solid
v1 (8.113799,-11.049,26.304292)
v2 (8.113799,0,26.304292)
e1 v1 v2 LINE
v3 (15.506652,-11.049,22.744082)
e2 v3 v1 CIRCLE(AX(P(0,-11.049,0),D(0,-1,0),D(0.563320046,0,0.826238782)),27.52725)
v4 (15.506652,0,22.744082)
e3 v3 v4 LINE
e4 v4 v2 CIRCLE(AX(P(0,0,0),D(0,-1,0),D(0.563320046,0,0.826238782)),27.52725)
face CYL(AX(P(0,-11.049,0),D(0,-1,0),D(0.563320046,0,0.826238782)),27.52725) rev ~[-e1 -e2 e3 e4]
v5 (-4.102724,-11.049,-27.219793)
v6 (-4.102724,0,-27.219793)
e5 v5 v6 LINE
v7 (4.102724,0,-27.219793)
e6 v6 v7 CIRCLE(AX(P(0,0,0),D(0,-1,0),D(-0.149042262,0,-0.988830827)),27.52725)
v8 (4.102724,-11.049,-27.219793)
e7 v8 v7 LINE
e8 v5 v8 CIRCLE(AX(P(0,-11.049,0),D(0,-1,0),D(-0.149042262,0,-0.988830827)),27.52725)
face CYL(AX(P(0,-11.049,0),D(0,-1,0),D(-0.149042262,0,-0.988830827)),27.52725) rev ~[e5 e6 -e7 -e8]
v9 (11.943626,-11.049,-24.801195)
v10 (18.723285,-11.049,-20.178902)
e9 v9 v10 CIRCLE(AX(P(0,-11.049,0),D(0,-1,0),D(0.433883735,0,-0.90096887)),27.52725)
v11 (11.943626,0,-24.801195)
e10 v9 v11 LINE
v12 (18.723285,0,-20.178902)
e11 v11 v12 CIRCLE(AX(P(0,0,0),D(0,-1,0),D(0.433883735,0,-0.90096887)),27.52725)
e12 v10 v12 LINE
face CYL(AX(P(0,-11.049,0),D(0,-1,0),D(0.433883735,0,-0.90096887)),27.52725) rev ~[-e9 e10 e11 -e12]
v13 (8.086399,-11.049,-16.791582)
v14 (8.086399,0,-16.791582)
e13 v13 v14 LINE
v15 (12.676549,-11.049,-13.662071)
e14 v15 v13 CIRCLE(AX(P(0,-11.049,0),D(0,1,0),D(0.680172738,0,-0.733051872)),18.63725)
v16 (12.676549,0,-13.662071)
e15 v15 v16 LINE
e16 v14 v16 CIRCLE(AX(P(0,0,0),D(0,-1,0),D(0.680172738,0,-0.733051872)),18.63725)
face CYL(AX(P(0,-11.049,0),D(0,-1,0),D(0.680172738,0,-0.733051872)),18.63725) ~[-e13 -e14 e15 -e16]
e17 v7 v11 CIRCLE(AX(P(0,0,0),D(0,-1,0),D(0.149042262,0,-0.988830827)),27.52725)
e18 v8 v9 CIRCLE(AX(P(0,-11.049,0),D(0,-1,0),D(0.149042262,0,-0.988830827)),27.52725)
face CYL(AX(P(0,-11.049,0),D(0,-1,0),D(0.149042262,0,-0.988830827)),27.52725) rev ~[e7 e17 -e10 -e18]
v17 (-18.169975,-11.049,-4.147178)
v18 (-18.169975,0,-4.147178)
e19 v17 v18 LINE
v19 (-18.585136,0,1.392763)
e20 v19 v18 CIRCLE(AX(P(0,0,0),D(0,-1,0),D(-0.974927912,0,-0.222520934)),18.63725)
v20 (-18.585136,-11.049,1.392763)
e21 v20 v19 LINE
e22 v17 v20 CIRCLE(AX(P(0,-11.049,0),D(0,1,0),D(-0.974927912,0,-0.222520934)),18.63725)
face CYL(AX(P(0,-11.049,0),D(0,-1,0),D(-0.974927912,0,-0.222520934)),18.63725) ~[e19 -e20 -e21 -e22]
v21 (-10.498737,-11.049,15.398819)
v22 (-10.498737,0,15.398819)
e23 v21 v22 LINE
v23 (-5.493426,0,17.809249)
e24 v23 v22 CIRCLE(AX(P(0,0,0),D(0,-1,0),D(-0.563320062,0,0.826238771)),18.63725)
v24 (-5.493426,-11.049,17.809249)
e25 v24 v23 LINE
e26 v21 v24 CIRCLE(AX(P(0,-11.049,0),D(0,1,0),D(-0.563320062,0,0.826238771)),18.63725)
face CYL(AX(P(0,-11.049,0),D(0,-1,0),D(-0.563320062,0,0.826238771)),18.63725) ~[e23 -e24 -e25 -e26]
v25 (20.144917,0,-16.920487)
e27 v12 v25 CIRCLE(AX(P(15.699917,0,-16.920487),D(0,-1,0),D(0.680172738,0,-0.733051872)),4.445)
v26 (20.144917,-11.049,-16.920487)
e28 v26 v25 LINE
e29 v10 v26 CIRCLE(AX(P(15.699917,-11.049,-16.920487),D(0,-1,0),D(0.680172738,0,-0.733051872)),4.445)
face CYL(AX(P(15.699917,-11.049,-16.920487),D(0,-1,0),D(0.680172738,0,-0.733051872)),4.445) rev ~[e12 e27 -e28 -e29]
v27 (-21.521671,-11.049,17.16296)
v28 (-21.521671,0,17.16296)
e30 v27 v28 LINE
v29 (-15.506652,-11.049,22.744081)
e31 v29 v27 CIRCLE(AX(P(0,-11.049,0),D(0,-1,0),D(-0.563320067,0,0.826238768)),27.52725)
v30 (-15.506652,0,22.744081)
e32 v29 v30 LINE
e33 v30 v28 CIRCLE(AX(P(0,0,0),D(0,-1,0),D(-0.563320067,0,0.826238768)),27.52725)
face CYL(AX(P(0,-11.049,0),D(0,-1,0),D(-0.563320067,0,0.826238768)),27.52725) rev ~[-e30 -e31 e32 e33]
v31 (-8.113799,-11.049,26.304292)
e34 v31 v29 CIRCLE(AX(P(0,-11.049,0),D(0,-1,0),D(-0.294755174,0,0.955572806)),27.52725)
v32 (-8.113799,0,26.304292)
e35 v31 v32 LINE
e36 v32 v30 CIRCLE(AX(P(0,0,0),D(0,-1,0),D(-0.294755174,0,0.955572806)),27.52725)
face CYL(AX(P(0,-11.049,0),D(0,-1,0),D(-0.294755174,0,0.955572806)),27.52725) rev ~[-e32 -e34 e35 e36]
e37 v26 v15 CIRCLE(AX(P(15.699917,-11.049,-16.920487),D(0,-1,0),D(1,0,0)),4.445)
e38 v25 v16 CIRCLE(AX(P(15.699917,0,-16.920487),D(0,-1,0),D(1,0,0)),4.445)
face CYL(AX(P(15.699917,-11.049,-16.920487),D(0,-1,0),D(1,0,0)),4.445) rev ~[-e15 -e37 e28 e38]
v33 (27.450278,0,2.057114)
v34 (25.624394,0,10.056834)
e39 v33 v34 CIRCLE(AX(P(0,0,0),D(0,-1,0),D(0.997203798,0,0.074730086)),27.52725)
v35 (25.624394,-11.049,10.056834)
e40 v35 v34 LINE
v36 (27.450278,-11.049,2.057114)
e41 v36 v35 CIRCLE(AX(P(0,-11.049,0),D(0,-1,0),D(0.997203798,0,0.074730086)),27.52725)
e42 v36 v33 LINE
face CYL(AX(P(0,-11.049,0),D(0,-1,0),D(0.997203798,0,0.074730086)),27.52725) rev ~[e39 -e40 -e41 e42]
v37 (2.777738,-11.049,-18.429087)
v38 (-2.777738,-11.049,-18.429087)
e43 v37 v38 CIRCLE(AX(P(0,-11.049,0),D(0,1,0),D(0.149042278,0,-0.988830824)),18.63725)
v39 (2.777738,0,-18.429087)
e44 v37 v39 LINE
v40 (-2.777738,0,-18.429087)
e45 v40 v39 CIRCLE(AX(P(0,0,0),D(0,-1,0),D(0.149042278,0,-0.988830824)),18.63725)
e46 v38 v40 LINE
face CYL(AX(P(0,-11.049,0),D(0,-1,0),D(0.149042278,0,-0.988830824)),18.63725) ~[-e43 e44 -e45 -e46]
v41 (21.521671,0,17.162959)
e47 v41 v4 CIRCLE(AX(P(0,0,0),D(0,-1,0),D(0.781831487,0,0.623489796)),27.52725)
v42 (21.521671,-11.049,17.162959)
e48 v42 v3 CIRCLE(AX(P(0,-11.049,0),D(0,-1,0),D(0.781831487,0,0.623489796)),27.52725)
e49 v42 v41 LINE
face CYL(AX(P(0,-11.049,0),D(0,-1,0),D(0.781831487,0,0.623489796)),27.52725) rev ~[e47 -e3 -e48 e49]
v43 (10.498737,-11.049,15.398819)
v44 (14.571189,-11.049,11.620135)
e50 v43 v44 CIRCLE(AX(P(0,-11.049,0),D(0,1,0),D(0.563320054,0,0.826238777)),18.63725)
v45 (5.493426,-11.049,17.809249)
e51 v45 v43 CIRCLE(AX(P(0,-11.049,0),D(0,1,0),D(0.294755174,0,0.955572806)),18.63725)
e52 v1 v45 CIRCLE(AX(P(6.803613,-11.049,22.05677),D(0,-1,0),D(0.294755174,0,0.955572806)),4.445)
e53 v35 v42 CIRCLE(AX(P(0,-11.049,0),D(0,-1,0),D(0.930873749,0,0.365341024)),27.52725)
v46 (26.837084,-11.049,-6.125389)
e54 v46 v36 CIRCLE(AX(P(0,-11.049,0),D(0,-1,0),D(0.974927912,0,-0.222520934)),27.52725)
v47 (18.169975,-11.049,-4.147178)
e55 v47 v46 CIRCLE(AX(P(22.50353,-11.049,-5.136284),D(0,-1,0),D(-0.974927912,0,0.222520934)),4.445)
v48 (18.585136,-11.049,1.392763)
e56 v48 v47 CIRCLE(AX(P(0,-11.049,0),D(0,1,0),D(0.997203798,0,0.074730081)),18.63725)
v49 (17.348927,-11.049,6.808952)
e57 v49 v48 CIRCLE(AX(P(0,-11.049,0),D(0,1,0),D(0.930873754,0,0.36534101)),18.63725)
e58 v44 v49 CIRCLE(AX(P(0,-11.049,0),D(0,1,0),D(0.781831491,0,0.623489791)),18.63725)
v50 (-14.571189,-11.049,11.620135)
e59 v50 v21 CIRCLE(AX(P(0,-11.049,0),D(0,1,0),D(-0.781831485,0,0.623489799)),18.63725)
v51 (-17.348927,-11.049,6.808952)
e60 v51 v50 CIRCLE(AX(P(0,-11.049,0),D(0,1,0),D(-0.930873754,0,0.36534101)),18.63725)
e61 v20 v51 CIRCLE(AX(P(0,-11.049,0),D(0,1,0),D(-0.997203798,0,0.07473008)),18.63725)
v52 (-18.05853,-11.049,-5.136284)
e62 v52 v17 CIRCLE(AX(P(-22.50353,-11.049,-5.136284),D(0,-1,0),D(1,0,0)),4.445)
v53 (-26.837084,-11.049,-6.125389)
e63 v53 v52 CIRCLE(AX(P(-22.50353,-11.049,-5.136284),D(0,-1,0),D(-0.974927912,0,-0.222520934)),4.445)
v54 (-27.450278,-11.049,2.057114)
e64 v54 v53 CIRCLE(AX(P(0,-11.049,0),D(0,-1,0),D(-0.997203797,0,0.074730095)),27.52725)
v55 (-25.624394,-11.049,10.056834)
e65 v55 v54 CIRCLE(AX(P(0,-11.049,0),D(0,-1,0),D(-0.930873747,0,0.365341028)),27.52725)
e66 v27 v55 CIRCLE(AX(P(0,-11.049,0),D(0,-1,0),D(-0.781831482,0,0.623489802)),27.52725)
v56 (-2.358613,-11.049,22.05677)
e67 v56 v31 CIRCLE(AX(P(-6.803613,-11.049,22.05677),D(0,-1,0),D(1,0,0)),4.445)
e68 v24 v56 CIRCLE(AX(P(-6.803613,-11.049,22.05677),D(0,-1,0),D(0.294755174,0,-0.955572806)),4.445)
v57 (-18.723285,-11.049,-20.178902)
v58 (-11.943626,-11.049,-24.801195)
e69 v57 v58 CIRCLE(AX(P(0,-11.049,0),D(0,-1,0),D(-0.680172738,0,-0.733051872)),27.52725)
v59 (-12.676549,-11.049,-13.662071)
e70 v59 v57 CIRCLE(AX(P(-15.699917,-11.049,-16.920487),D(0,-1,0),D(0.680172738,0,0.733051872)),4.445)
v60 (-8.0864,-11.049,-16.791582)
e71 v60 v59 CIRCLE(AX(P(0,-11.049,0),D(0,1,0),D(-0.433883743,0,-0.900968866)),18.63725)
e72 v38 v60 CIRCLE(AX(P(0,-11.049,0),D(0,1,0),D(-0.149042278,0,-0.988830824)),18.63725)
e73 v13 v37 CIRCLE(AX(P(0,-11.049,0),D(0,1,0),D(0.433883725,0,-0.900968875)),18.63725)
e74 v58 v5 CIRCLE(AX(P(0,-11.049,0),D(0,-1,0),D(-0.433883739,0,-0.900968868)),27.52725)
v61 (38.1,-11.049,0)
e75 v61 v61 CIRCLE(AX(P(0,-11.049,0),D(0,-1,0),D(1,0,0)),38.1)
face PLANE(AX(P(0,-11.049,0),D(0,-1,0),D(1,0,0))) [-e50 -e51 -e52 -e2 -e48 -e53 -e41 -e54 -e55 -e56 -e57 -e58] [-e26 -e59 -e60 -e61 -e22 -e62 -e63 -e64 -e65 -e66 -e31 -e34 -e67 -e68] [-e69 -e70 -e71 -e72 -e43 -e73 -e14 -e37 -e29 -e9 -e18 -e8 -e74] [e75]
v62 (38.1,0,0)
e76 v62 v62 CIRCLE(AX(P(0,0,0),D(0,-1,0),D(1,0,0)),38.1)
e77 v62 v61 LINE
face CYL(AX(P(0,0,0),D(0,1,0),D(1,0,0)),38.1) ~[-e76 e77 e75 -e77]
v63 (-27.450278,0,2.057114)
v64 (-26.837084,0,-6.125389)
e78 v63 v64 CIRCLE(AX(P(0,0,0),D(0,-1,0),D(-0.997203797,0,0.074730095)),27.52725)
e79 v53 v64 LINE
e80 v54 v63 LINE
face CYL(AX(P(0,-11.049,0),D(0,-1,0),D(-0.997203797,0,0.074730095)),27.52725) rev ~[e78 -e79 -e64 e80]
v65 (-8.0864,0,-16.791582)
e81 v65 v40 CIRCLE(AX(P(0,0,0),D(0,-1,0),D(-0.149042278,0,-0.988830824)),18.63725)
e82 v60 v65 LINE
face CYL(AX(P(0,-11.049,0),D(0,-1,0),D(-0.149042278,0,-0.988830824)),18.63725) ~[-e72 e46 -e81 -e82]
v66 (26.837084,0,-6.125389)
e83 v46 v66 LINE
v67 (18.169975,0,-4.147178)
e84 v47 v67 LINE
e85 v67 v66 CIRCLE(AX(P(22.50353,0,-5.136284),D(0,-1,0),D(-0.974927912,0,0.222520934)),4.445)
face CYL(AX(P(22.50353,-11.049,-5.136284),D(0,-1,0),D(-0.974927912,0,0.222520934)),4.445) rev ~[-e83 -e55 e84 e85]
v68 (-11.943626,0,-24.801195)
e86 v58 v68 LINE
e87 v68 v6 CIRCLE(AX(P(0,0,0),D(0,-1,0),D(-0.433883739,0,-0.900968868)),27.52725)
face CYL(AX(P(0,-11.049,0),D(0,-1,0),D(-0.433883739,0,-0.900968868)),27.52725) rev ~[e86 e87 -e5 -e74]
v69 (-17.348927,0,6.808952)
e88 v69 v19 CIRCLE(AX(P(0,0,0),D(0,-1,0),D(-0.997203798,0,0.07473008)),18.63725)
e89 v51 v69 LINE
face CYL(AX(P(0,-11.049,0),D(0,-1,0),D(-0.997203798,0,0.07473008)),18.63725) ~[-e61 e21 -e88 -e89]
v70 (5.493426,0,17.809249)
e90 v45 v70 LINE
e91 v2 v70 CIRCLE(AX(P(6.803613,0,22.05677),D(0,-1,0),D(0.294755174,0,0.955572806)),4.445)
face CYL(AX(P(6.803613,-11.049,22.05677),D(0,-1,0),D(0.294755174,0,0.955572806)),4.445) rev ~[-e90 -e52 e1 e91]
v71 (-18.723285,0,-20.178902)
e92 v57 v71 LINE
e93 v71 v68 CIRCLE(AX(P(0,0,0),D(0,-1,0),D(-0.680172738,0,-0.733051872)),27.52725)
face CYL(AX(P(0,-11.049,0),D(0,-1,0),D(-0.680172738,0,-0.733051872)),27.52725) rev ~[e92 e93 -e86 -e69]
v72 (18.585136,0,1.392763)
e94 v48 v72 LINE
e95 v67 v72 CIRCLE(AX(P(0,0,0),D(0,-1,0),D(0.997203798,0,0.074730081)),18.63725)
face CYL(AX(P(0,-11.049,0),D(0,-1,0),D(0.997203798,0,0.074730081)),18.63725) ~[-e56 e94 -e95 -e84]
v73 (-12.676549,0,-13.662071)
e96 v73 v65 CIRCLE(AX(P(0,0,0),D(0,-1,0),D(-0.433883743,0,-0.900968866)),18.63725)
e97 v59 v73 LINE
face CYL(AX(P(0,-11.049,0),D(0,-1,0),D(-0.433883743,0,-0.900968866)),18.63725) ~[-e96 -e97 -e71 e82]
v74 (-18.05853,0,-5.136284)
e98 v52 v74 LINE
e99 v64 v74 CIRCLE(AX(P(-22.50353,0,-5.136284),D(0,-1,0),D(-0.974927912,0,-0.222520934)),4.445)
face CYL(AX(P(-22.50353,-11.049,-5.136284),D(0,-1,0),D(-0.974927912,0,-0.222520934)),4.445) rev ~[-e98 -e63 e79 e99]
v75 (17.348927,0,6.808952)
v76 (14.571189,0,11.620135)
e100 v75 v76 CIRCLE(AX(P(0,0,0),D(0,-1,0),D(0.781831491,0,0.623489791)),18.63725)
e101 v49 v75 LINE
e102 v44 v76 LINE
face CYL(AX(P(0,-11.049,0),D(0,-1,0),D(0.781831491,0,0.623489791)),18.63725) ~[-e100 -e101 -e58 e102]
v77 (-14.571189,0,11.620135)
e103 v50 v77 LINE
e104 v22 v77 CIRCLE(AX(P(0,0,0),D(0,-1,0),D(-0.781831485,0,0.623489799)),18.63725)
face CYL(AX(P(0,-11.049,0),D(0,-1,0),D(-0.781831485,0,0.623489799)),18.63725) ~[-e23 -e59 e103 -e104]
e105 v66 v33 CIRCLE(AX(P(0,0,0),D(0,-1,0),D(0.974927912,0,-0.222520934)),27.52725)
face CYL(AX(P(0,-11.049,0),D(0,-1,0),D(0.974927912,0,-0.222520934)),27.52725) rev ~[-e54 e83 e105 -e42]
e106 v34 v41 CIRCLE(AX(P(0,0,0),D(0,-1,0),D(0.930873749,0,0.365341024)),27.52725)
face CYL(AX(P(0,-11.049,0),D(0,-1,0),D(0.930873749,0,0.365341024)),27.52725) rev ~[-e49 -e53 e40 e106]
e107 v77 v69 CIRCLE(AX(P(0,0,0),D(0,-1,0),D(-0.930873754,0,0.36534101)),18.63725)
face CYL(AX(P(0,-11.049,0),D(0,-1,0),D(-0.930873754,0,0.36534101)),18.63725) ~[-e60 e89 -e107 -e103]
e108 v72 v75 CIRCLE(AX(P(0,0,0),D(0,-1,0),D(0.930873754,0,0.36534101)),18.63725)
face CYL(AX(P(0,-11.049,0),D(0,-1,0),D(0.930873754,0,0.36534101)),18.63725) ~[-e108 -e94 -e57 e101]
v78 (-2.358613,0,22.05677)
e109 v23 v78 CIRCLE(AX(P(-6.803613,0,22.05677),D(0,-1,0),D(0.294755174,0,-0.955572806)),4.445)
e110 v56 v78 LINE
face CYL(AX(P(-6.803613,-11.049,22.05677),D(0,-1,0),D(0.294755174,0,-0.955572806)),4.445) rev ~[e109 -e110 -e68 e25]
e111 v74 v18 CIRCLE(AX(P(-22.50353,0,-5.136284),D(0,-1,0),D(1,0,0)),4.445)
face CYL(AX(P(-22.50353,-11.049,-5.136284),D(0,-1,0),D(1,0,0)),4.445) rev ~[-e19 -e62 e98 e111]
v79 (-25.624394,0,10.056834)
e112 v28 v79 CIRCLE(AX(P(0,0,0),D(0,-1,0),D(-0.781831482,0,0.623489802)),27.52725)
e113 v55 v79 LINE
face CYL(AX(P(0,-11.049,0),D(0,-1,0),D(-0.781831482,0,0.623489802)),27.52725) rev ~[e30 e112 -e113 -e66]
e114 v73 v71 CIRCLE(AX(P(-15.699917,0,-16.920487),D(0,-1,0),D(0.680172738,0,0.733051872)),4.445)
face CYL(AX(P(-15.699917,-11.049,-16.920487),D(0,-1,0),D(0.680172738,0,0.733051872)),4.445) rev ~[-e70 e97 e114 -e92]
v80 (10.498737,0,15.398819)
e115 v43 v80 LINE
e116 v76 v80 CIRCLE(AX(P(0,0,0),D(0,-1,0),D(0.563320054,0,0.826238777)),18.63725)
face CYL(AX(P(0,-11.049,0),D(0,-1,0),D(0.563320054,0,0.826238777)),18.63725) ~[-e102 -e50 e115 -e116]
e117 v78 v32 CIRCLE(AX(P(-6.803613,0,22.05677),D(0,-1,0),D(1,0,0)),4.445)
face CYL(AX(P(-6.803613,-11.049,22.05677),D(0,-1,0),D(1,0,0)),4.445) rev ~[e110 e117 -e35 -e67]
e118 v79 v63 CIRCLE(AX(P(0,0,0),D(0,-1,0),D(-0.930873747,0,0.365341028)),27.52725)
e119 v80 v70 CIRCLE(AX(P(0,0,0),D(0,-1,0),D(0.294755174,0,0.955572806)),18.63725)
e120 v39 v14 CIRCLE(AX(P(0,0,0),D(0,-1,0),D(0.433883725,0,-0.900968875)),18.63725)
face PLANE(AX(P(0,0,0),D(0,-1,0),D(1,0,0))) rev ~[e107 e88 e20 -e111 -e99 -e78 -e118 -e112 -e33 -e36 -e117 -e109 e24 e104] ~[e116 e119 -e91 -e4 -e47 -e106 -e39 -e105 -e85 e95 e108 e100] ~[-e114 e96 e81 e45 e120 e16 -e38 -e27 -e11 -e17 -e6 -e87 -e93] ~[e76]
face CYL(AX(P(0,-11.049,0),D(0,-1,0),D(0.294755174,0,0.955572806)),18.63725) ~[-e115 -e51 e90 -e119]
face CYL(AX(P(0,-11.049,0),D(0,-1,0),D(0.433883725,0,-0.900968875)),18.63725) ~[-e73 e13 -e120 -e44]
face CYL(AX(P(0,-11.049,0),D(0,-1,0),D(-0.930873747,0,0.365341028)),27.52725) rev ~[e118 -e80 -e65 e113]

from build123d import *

# Parameters (mm, degrees)
F0_R     = 38.1
F1_DEPTH = 11.049
F3_DEPTH = 11.05


with BuildPart() as f1:
    # F0 (on Front) → F1 (new body)
    with BuildSketch(Plane.XZ):
        Circle(F0_R)
    extrude(amount=F1_DEPTH)

    # F2 (on face) → F3 (cut, through all)
    with BuildSketch(Plane.XZ.offset(11.049)):
        with BuildLine():
            ThreePointArc((-5.4934258743, 17.8092492746), (-3.2271754935, 19.4172396715), (-2.3586126245, 22.0567703964))
            ThreePointArc((-2.3586126245, 22.0567703964), (-4.1640818997, 25.6332075274), (-8.1137993748, 26.3042915181))
            ThreePointArc((-8.1137993748, 26.3042915181), (-10.0430162679, 25.1004998579), (-11.1244292478, 23.1001153577))
            ThreePointArc((-11.1244292478, 23.1001153577), (-9.253900361, 21.4598737334), (-8.5576944102, 19.0714499485))
            ThreePointArc((-8.5576944102, 19.0714499485), (-8.5888494373, 18.5460952541), (-8.681877787, 18.0281049871))
            ThreePointArc((-8.681877787, 18.0281049871), (-7.108001728, 17.6222047723), (-5.4934258743, 17.8092492746))
        make_face()
        with BuildLine():
            ThreePointArc((-11.1244292478, 23.1001153577), (-10.0430162679, 25.1004998579), (-8.1137993748, 26.3042915181))
            ThreePointArc((-8.1137993748, 26.3042915181), (-11.9436262917, 24.8011952044), (-15.5066523142, 22.7440811326))
            ThreePointArc((-15.5066523142, 22.7440811326), (-13.36264294, 23.5018519681), (-11.1244292478, 23.1001153577))
        make_face()
        with BuildLine():
            ThreePointArc((-10.498736832, 15.3988185422), (-8.0863997604, 16.7915820124), (-5.4934258743, 17.8092492746))
            ThreePointArc((-5.4934258743, 17.8092492746), (-7.108001728, 17.6222047723), (-8.681877787, 18.0281049871))
            ThreePointArc((-8.681877787, 18.0281049871), (-9.34582792, 16.5445244505), (-10.498736832, 15.3988185422))
        make_face()
        with BuildLine():
            ThreePointArc((-8.5576944102, 19.0714499485), (-9.253900361, 21.4598737334), (-11.1244292478, 23.1001153577))
            ThreePointArc((-11.1244292478, 23.1001153577), (-10.8084192424, 20.128157176), (-8.681877787, 18.0281049871))
            ThreePointArc((-8.681877787, 18.0281049871), (-8.5888494373, 18.5460952541), (-8.5576944102, 19.0714499485))
        make_face()
        with BuildLine():
            ThreePointArc((-8.681877787, 18.0281049871), (-10.8084192424, 20.128157176), (-11.1244292478, 23.1001153577))
            ThreePointArc((-11.1244292478, 23.1001153577), (-13.36264294, 23.5018519681), (-15.5066523142, 22.7440811326))
            ThreePointArc((-15.5066523142, 22.7440811326), (-16.9953355125, 21.0251239305), (-17.4390806002, 18.7948589632))
            ThreePointArc((-17.4390806002, 18.7948589632), (-14.7880141659, 17.4149152983), (-13.6100435462, 14.6681384642))
            ThreePointArc((-13.6100435462, 14.6681384642), (-11.986449243, 14.7441793583), (-10.498736832, 15.3988185422))
            ThreePointArc((-10.498736832, 15.3988185422), (-9.34582792, 16.5445244505), (-8.681877787, 18.0281049871))
        make_face()
        with BuildLine():
            ThreePointArc((-17.4390806002, 18.7948589632), (-16.9953355125, 21.0251239305), (-15.5066523142, 22.7440811326))
            ThreePointArc((-15.5066523142, 22.7440811326), (-18.7232851045, 20.178902038), (-21.5216706751, 17.1629596491))
            ThreePointArc((-21.5216706751, 17.1629596491), (-19.696270544, 18.5190225314), (-17.4390806002, 18.7948589632))
        make_face()
        with BuildLine():
            ThreePointArc((-14.571188844, 11.6201352503), (-12.6765494203, 13.6620709396), (-10.498736832, 15.3988185422))
            ThreePointArc((-10.498736832, 15.3988185422), (-11.986449243, 14.7441793583), (-13.6100435462, 14.6681384642))
            ThreePointArc((-13.6100435462, 14.6681384642), (-13.6035837106, 14.5299100198), (-13.6014297362, 14.391547479))
            ThreePointArc((-13.6014297362, 14.391547479), (-13.8508683455, 12.9234570127), (-14.571188844, 11.6201352503))
        make_face()
        with BuildLine():
            ThreePointArc((-13.6100435462, 14.6681384642), (-14.7880141659, 17.4149152983), (-17.4390806002, 18.7948589632))
            ThreePointArc((-17.4390806002, 18.7948589632), (-16.2611099805, 16.0480821291), (-13.6100435462, 14.6681384642))
        make_face()
        with BuildLine():
            ThreePointArc((-13.6100435462, 14.6681384642), (-16.2611099805, 16.0480821291), (-17.4390806002, 18.7948589632))
            ThreePointArc((-17.4390806002, 18.7948589632), (-19.696270544, 18.5190225314), (-21.5216706751, 17.1629596491))
            ThreePointArc((-21.5216706751, 17.1629596491), (-22.437544489, 15.0815737307), (-22.2041931112, 12.8195968699))
            ThreePointArc((-22.2041931112, 12.8195968699), (-19.2641605846, 12.2823757795), (-17.3288972096, 10.0048434687))
            ThreePointArc((-17.3288972096, 10.0048434687), (-15.7998480839, 10.5560689065), (-14.571188844, 11.6201352503))
            ThreePointArc((-14.571188844, 11.6201352503), (-13.8508683455, 12.9234570127), (-13.6014297362, 14.391547479))
            ThreePointArc((-13.6014297362, 14.391547479), (-13.6035837106, 14.5299100198), (-13.6100435462, 14.6681384642))
        make_face()
        with BuildLine():
            ThreePointArc((-22.2041931112, 12.8195968699), (-22.437544489, 15.0815737307), (-21.5216706751, 17.1629596491))
            ThreePointArc((-21.5216706751, 17.1629596491), (-23.8392977721, 13.7636250419), (-25.6243943624, 10.0568338021))
            ThreePointArc((-25.6243943624, 10.0568338021), (-24.2797981866, 11.8906966911), (-22.2041931112, 12.8195968699))
        make_face()
        with BuildLine():
            ThreePointArc((-17.3489268741, 6.8089517461), (-16.1403320456, 9.3186248461), (-14.571188844, 11.6201352503))
            ThreePointArc((-14.571188844, 11.6201352503), (-15.7998480839, 10.5560689065), (-17.3288972096, 10.0048434687))
            ThreePointArc((-17.3288972096, 10.0048434687), (-17.114059345, 9.2318818452), (-17.0416605846, 8.4328928597))
            ThreePointArc((-17.0416605846, 8.4328928597), (-17.1191526371, 7.6065156285), (-17.3489268741, 6.8089517461))
        make_face()
        with BuildLine():
            ThreePointArc((-17.3288972096, 10.0048434687), (-19.2641605846, 12.2823757795), (-22.2041931112, 12.8195968699))
            ThreePointArc((-22.2041931112, 12.8195968699), (-20.2689297362, 10.5420645591), (-17.3288972096, 10.0048434687))
        make_face()
        with BuildLine():
            ThreePointArc((-17.3288972096, 10.0048434687), (-20.2689297362, 10.5420645591), (-22.2041931112, 12.8195968699))
            ThreePointArc((-22.2041931112, 12.8195968699), (-24.2797981866, 11.8906966911), (-25.6243943624, 10.0568338021))
            ThreePointArc((-25.6243943624, 10.0568338021), (-25.8860792444, 7.7979594331), (-24.9963656228, 5.7052573369))
            ThreePointArc((-24.9963656228, 5.7052573369), (-22.028601796, 6.0584932723), (-19.5080023094, 4.4525742255))
            ThreePointArc((-19.5080023094, 4.4525742255), (-18.209361165, 5.4300053303), (-17.3489268741, 6.8089517461))
            ThreePointArc((-17.3489268741, 6.8089517461), (-17.1191526371, 7.6065156285), (-17.0416605846, 8.4328928597))
            ThreePointArc((-17.0416605846, 8.4328928597), (-17.114059345, 9.2318818452), (-17.3288972096, 10.0048434687))
        make_face()
        with BuildLine():
            ThreePointArc((-24.9963656228, 5.7052573369), (-25.8860792444, 7.7979594331), (-25.6243943624, 10.0568338021))
            ThreePointArc((-25.6243943624, 10.0568338021), (-26.8370843559, 6.1253894436), (-27.4502782232, 2.0571140049))
            ThreePointArc((-27.4502782232, 2.0571140049), (-26.7059592707, 4.205830226), (-24.9963656228, 5.7052573369))
        make_face()
        with BuildLine():
            ThreePointArc((-18.5851364875, 1.3927631904), (-18.1699752899, 4.1471780197), (-17.3489268741, 6.8089517461))
            ThreePointArc((-17.3489268741, 6.8089517461), (-18.209361165, 5.4300053303), (-19.5080023094, 4.4525742255))
            ThreePointArc((-19.5080023094, 4.4525742255), (-18.81302758, 3.1667060392), (-18.5727073475, 1.7249387027))
            ThreePointArc((-18.5727073475, 1.7249387027), (-18.5758157193, 1.5587347207), (-18.5851364875, 1.3927631904))
        make_face()
        with BuildLine():
            ThreePointArc((-19.5080023094, 4.4525742255), (-22.028601796, 6.0584932723), (-24.9963656228, 5.7052573369))
            ThreePointArc((-24.9963656228, 5.7052573369), (-22.4757661361, 4.09933829), (-19.5080023094, 4.4525742255))
        make_face()
        with BuildLine():
            ThreePointArc((-19.5080023094, 4.4525742255), (-22.4757661361, 4.09933829), (-24.9963656228, 5.7052573369))
            ThreePointArc((-24.9963656228, 5.7052573369), (-26.7059592707, 4.205830226), (-27.4502782232, 2.0571140049))
            ThreePointArc((-27.4502782232, 2.0571140049), (-27.0345222544, -0.1785378544), (-25.567501354, -1.9160193477))
            ThreePointArc((-25.567501354, -1.9160193477), (-22.835705067, -0.7037129493), (-19.9537357944, -1.4953257775))
            ThreePointArc((-19.9537357944, -1.4953257775), (-19.0008925012, -0.1785379824), (-18.5851364875, 1.3927631904))
            ThreePointArc((-18.5851364875, 1.3927631904), (-18.5758157193, 1.5587347207), (-18.5727073475, 1.7249387027))
            ThreePointArc((-18.5727073475, 1.7249387027), (-18.81302758, 3.1667060392), (-19.5080023094, 4.4525742255))
        make_face()
        with BuildLine():
            ThreePointArc((-25.567501354, -1.9160193477), (-27.0345222544, -0.1785378544), (-27.4502782232, 2.0571140049))
            ThreePointArc((-27.4502782232, 2.0571140049), (-27.4502782273, -2.0571139506), (-26.8370843706, -6.1253893792))
            ThreePointArc((-26.8370843706, -6.1253893792), (-26.7591786586, -3.8527427103), (-25.567501354, -1.9160193477))
        make_face()
        with BuildLine():
            ThreePointArc((-18.1699752313, -4.1471782764), (-18.5851364598, -1.3927635598), (-18.5851364875, 1.3927631904))
            ThreePointArc((-18.5851364875, 1.3927631904), (-19.0008925012, -0.1785379824), (-19.9537357944, -1.4953257775))
            ThreePointArc((-19.9537357944, -1.4953257775), (-18.8152778676, -2.6553923195), (-18.1699752313, -4.1471782764))
        make_face()
        with BuildLine():
            ThreePointArc((-19.9537357944, -1.4953257775), (-22.835705067, -0.7037129493), (-25.567501354, -1.9160193477))
            ThreePointArc((-25.567501354, -1.9160193477), (-22.6855320815, -2.7076321758), (-19.9537357944, -1.4953257775))
        make_face()
        with BuildLine():
            ThreePointArc((-19.9537357944, -1.4953257775), (-22.6855320815, -2.7076321758), (-25.567501354, -1.9160193477))
            ThreePointArc((-25.567501354, -1.9160193477), (-26.7591786586, -3.8527427103), (-26.8370843706, -6.1253893792))
            ThreePointArc((-26.8370843706, -6.1253893792), (-22.0058477047, -9.5533346008), (-18.058529801, -5.1362838278))
            ThreePointArc((-18.058529801, -5.1362838278), (-18.086479028, -4.6386017315), (-18.1699752313, -4.1471782764))
            ThreePointArc((-18.1699752313, -4.1471782764), (-18.8152778676, -2.6553923195), (-19.9537357944, -1.4953257775))
        make_face()
        with BuildLine():
            ThreePointArc((-11.2718580074, -16.5327792097), (-11.7072761395, -14.9668124528), (-12.676549357, -13.6620709983))
            ThreePointArc((-12.676549357, -13.6620709983), (-18.9583327467, -13.8971187492), (-18.7232849958, -20.1789021388))
            ThreePointArc((-18.7232849958, -20.1789021388), (-16.7161623907, -21.2477571476), (-14.4430721062, -21.18409601))
            ThreePointArc((-14.4430721062, -21.18409601), (-13.6876442891, -18.292430993), (-11.2718580074, -16.5327792097))
        make_face()
        with BuildLine():
            ThreePointArc((-8.0863997947, -16.7915819959), (-10.4987367878, -15.3988185723), (-12.676549357, -13.6620709983))
            ThreePointArc((-12.676549357, -13.6620709983), (-11.7072761395, -14.9668124528), (-11.2718580074, -16.5327792097))
            ThreePointArc((-11.2718580074, -16.5327792097), (-9.6550645989, -16.3659866159), (-8.0863997947, -16.7915819959))
        make_face()
        with BuildLine():
            ThreePointArc((-14.4430721062, -21.18409601), (-16.7161623907, -21.2477571476), (-18.7232849958, -20.1789021388))
            ThreePointArc((-18.7232849958, -20.1789021388), (-15.5066520681, -22.7440813004), (-11.9436261572, -24.8011952692))
            ThreePointArc((-11.9436261572, -24.8011952692), (-13.6718794549, -23.3233141096), (-14.4430721062, -21.18409601))
        make_face()
        with BuildLine():
            ThreePointArc((-8.0863997947, -16.7915819959), (-9.6550645989, -16.3659866159), (-11.2718580074, -16.5327792097))
            ThreePointArc((-11.2718580074, -16.5327792097), (-11.2591544038, -16.7264479204), (-11.2549171764, -16.9204865685))
            ThreePointArc((-11.2549171764, -16.9204865685), (-12.1400926486, -19.5823795663), (-14.4430721062, -21.18409601))
            ThreePointArc((-14.4430721062, -21.18409601), (-13.6718794549, -23.3233141096), (-11.9436261572, -24.8011952692))
            ThreePointArc((-11.9436261572, -24.8011952692), (-9.7106238335, -25.2309542751), (-7.5572850225, -24.5001163))
            ThreePointArc((-7.5572850225, -24.5001163), (-7.6877519702, -21.5142535884), (-5.8979587632, -19.1207126897))
            ThreePointArc((-5.8979587632, -19.1207126897), (-6.7756093234, -17.7526591581), (-8.0863997947, -16.7915819959))
        make_face()
        with BuildLine():
            ThreePointArc((-11.2549171764, -16.9204865685), (-11.2591544038, -16.7264479204), (-11.2718580074, -16.5327792097))
            ThreePointArc((-11.2718580074, -16.5327792097), (-13.6876442891, -18.292430993), (-14.4430721062, -21.18409601))
            ThreePointArc((-14.4430721062, -21.18409601), (-12.1400926486, -19.5823795663), (-11.2549171764, -16.9204865685))
        make_face()
        with BuildLine():
            ThreePointArc((-2.777738202, -18.4290872819), (-5.4934260251, -17.8092492281), (-8.0863997947, -16.7915819959))
            ThreePointArc((-8.0863997947, -16.7915819959), (-6.7756093234, -17.7526591581), (-5.8979587632, -19.1207126897))
            ThreePointArc((-5.8979587632, -19.1207126897), (-4.4021579991, -18.4847720153), (-2.777738202, -18.4290872819))
        make_face()
        with BuildLine():
            ThreePointArc((-7.5572850225, -24.5001163), (-9.7106238335, -25.2309542751), (-11.9436261572, -24.8011952692))
            ThreePointArc((-11.9436261572, -24.8011952692), (-8.1137993206, -26.3042915348), (-4.10272361, -27.219793378))
            ThreePointArc((-4.10272361, -27.219793378), (-6.1898086487, -26.3169819519), (-7.5572850225, -24.5001163))
        make_face()
        with BuildLine():
            ThreePointArc((-2.777738202, -18.4290872819), (-4.4021579991, -18.4847720153), (-5.8979587632, -19.1207126897))
            ThreePointArc((-5.8979587632, -19.1207126897), (-5.6527697755, -19.9426559072), (-5.5700129372, -20.7963886511))
            ThreePointArc((-5.5700129372, -20.7963886511), (-6.0982141435, -22.8979861886), (-7.5572850225, -24.5001163))
            ThreePointArc((-7.5572850225, -24.5001163), (-6.1898086487, -26.3169819519), (-4.10272361, -27.219793378))
            ThreePointArc((-4.10272361, -27.219793378), (-1.8422536822, -26.9722703708), (0, -25.6391937398))
            ThreePointArc((0, -25.6391937398), (-1.0047691516, -22.8244403386), (0, -20.0096869375))
            ThreePointArc((0, -20.0096869375), (-1.2418999278, -18.9611041944), (-2.777738202, -18.4290872819))
        make_face()
        with BuildLine():
            ThreePointArc((-5.5700129372, -20.7963886511), (-5.6527697755, -19.9426559072), (-5.8979587632, -19.1207126897))
            ThreePointArc((-5.8979587632, -19.1207126897), (-7.6877519702, -21.5142535884), (-7.5572850225, -24.5001163))
            ThreePointArc((-7.5572850225, -24.5001163), (-6.0982141435, -22.8979861886), (-5.5700129372, -20.7963886511))
        make_face()
        with BuildLine():
            ThreePointArc((2.7777382002, -18.4290872822), (-9e-10, -18.63725), (-2.777738202, -18.4290872819))
            ThreePointArc((-2.777738202, -18.4290872819), (-1.2418999278, -18.9611041944), (0, -20.0096869375))
            ThreePointArc((0, -20.0096869375), (1.241899927, -18.9611041949), (2.7777382002, -18.4290872822))
        make_face()
        with BuildLine():
            ThreePointArc((0, -25.6391937398), (-1.8422536822, -26.9722703708), (-4.10272361, -27.219793378))
            ThreePointArc((-4.10272361, -27.219793378), (3e-10, -27.52725), (4.1027236105, -27.219793378))
            ThreePointArc((4.1027236105, -27.219793378), (1.8422536824, -26.9722703709), (0, -25.6391937398))
        make_face()
        with BuildLine():
            ThreePointArc((2.7777382002, -18.4290872822), (1.241899927, -18.9611041949), (0, -20.0096869375))
            ThreePointArc((0, -20.0096869375), (0.7460473985, -21.3300844776), (1.0047691516, -22.8244403386))
            ThreePointArc((1.0047691516, -22.8244403386), (0.7460473985, -24.3187961996), (0, -25.6391937398))
            ThreePointArc((0, -25.6391937398), (1.8422536824, -26.9722703709), (4.1027236105, -27.219793378))
            ThreePointArc((4.1027236105, -27.219793378), (6.1898086489, -26.3169819518), (7.5572850225, -24.5001163))
            ThreePointArc((7.5572850225, -24.5001163), (5.7674918155, -22.1065754014), (5.8979587632, -19.1207126897))
            ThreePointArc((5.8979587632, -19.1207126897), (4.4021579983, -18.4847720151), (2.7777382002, -18.4290872822))
        make_face()
        with BuildLine():
            ThreePointArc((1.0047691516, -22.8244403386), (0.7460473985, -21.3300844776), (0, -20.0096869375))
            ThreePointArc((0, -20.0096869375), (-1.0047691516, -22.8244403386), (0, -25.6391937398))
            ThreePointArc((0, -25.6391937398), (0.7460473985, -24.3187961996), (1.0047691516, -22.8244403386))
        make_face()
        with BuildLine():
            ThreePointArc((8.0863994561, -16.7915821589), (5.4934258447, -17.8092492838), (2.7777382002, -18.4290872822))
            ThreePointArc((2.7777382002, -18.4290872822), (4.4021579983, -18.4847720151), (5.8979587632, -19.1207126897))
            ThreePointArc((5.8979587632, -19.1207126897), (6.7756091948, -17.752659295), (8.0863994561, -16.7915821589))
        make_face()
        with BuildLine():
            ThreePointArc((7.5572850225, -24.5001163), (6.1898086489, -26.3169819518), (4.1027236105, -27.219793378))
            ThreePointArc((4.1027236105, -27.219793378), (8.1137992679, -26.3042915511), (11.9436260573, -24.8011953173))
            ThreePointArc((11.9436260573, -24.8011953173), (9.7106237782, -25.2309542713), (7.5572850225, -24.5001163))
        make_face()
        with BuildLine():
            ThreePointArc((8.0863994561, -16.7915821589), (6.7756091948, -17.752659295), (5.8979587632, -19.1207126897))
            ThreePointArc((5.8979587632, -19.1207126897), (7.3570296422, -20.7228428012), (7.8852308484, -22.8244403386))
            ThreePointArc((7.8852308484, -22.8244403386), (7.8024740102, -23.6781730826), (7.5572850225, -24.5001163))
            ThreePointArc((7.5572850225, -24.5001163), (9.7106237782, -25.2309542713), (11.9436260573, -24.8011953173))
            ThreePointArc((11.9436260573, -24.8011953173), (13.6718794233, -23.3233141552), (14.4430721062, -21.18409601))
            ThreePointArc((14.4430721062, -21.18409601), (12.0272858246, -19.4244442266), (11.2718580074, -16.5327792097))
            ThreePointArc((11.2718580074, -16.5327792097), (9.6550644116, -16.3659866311), (8.0863994561, -16.7915821589))
        make_face()
        with BuildLine():
            ThreePointArc((7.8852308484, -22.8244403386), (7.3570296422, -20.7228428012), (5.8979587632, -19.1207126897))
            ThreePointArc((5.8979587632, -19.1207126897), (5.7674918155, -22.1065754014), (7.5572850225, -24.5001163))
            ThreePointArc((7.5572850225, -24.5001163), (7.8024740102, -23.6781730826), (7.8852308484, -22.8244403386))
        make_face()
        with BuildLine():
            ThreePointArc((12.676549357, -13.6620709983), (10.4987366326, -15.3988186781), (8.0863994561, -16.7915821589))
            ThreePointArc((8.0863994561, -16.7915821589), (9.6550644116, -16.3659866311), (11.2718580074, -16.5327792097))
            ThreePointArc((11.2718580074, -16.5327792097), (11.7072761395, -14.9668124528), (12.676549357, -13.6620709983))
        make_face()
        with BuildLine():
            ThreePointArc((14.4430721062, -21.18409601), (13.6718794233, -23.3233141552), (11.9436260573, -24.8011953173))
            ThreePointArc((11.9436260573, -24.8011953173), (15.5066520223, -22.7440813317), (18.7232849958, -20.1789021388))
            ThreePointArc((18.7232849958, -20.1789021388), (16.7161623907, -21.2477571476), (14.4430721062, -21.18409601))
        make_face()
        with BuildLine():
            ThreePointArc((12.676549357, -13.6620709983), (11.7072761395, -14.9668124528), (11.2718580074, -16.5327792097))
            ThreePointArc((11.2718580074, -16.5327792097), (13.574837465, -18.1344956534), (14.4600129372, -20.7963886511))
            ThreePointArc((14.4600129372, -20.7963886511), (14.4557757099, -20.9904272993), (14.4430721062, -21.18409601))
            ThreePointArc((14.4430721062, -21.18409601), (16.7161623907, -21.2477571476), (18.7232849958, -20.1789021388))
            ThreePointArc((18.7232849958, -20.1789021388), (19.7740364038, -18.6980066166), (20.1449171764, -16.9204865685))
            ThreePointArc((20.1449171764, -16.9204865685), (17.4774372245, -12.8463673412), (12.676549357, -13.6620709983))
        make_face()
        with BuildLine():
            ThreePointArc((14.4600129372, -20.7963886511), (13.574837465, -18.1344956534), (11.2718580074, -16.5327792097))
            ThreePointArc((11.2718580074, -16.5327792097), (12.0272858246, -19.4244442266), (14.4430721062, -21.18409601))
            ThreePointArc((14.4430721062, -21.18409601), (14.4557757099, -20.9904272993), (14.4600129372, -20.7963886511))
        make_face()
        with BuildLine():
            ThreePointArc((19.9537357944, -1.4953257775), (18.8152778676, -2.6553923195), (18.1699752313, -4.1471782764))
            ThreePointArc((18.1699752313, -4.1471782764), (21.5144242495, -9.4698383975), (26.8370843706, -6.1253893792))
            ThreePointArc((26.8370843706, -6.1253893792), (26.9205805739, -5.6339659241), (26.948529801, -5.1362838278))
            ThreePointArc((26.948529801, -5.1362838278), (26.5887090231, -3.3843318526), (25.567501354, -1.9160193477))
            ThreePointArc((25.567501354, -1.9160193477), (22.6855320815, -2.7076321758), (19.9537357944, -1.4953257775))
        make_face()
        with BuildLine():
            ThreePointArc((18.5851364872, 1.3927631935), (18.5851364599, -1.3927635583), (18.1699752313, -4.1471782764))
            ThreePointArc((18.1699752313, -4.1471782764), (18.8152778676, -2.6553923195), (19.9537357944, -1.4953257775))
            ThreePointArc((19.9537357944, -1.4953257775), (19.0008925005, -0.178537981), (18.5851364872, 1.3927631935))
        make_face()
        with BuildLine():
            ThreePointArc((26.948529801, -5.1362838278), (26.9205805739, -5.6339659241), (26.8370843706, -6.1253893792))
            ThreePointArc((26.8370843706, -6.1253893792), (27.4502782184, -2.0571140698), (27.4502782411, 2.0571137665))
            ThreePointArc((27.4502782411, 2.0571137665), (27.4595989841, 1.8911424599), (27.4627073475, 1.7249387027))
            ThreePointArc((27.4627073475, 1.7249387027), (26.9605400449, -0.327400285), (25.567501354, -1.9160193477))
            ThreePointArc((25.567501354, -1.9160193477), (26.5887090231, -3.3843318526), (26.948529801, -5.1362838278))
        make_face()
        with BuildLine():
            ThreePointArc((18.5851364872, 1.3927631935), (19.0008925005, -0.178537981), (19.9537357944, -1.4953257775))
            ThreePointArc((19.9537357944, -1.4953257775), (22.835705067, -0.7037129493), (25.567501354, -1.9160193477))
            ThreePointArc((25.567501354, -1.9160193477), (26.9605400449, -0.327400285), (27.4627073475, 1.7249387027))
            ThreePointArc((27.4627073475, 1.7249387027), (27.4595989841, 1.8911424599), (27.4502782411, 2.0571137665))
            ThreePointArc((27.4502782411, 2.0571137665), (26.7059593375, 4.2058301268), (24.9963656228, 5.7052573369))
            ThreePointArc((24.9963656228, 5.7052573369), (22.4757661361, 4.09933829), (19.5080023094, 4.4525742255))
            ThreePointArc((19.5080023094, 4.4525742255), (18.7620584546, 3.0084797035), (18.5851364872, 1.3927631935))
        make_face()
        with BuildLine():
            ThreePointArc((25.567501354, -1.9160193477), (22.835705067, -0.7037129493), (19.9537357944, -1.4953257775))
            ThreePointArc((19.9537357944, -1.4953257775), (22.6855320815, -2.7076321758), (25.567501354, -1.9160193477))
        make_face()
        with BuildLine():
            ThreePointArc((17.3489268739, 6.8089517465), (18.1699752895, 4.1471780214), (18.5851364872, 1.3927631935))
            ThreePointArc((18.5851364872, 1.3927631935), (18.7620584546, 3.0084797035), (19.5080023094, 4.4525742255))
            ThreePointArc((19.5080023094, 4.4525742255), (18.2093611648, 5.4300053305), (17.3489268739, 6.8089517465))
        make_face()
        with BuildLine():
            ThreePointArc((24.9963656228, 5.7052573369), (26.7059593375, 4.2058301268), (27.4502782411, 2.0571137665))
            ThreePointArc((27.4502782411, 2.0571137665), (26.8370843933, 6.12538928), (25.6243943976, 10.0568337123))
            ThreePointArc((25.6243943976, 10.0568337123), (25.8541685582, 9.2592699531), (25.9316605846, 8.4328928597))
            ThreePointArc((25.9316605846, 8.4328928597), (25.6913403521, 6.9911255231), (24.9963656228, 5.7052573369))
        make_face()
        with BuildLine():
            ThreePointArc((17.3489268739, 6.8089517465), (18.2093611648, 5.4300053305), (19.5080023094, 4.4525742255))
            ThreePointArc((19.5080023094, 4.4525742255), (22.028601796, 6.0584932723), (24.9963656228, 5.7052573369))
            ThreePointArc((24.9963656228, 5.7052573369), (25.6913403521, 6.9911255231), (25.9316605846, 8.4328928597))
            ThreePointArc((25.9316605846, 8.4328928597), (25.8541685582, 9.2592699531), (25.6243943976, 10.0568337123))
            ThreePointArc((25.6243943976, 10.0568337123), (24.2797982242, 11.8906966607), (22.2041931112, 12.8195968699))
            ThreePointArc((22.2041931112, 12.8195968699), (20.2689297362, 10.5420645591), (17.3288972096, 10.0048434687))
            ThreePointArc((17.3288972096, 10.0048434687), (17.0417478802, 8.4050351858), (17.3489268739, 6.8089517465))
        make_face()
        with BuildLine():
            ThreePointArc((24.9963656228, 5.7052573369), (22.028601796, 6.0584932723), (19.5080023094, 4.4525742255))
            ThreePointArc((19.5080023094, 4.4525742255), (22.4757661361, 4.09933829), (24.9963656228, 5.7052573369))
        make_face()
        with BuildLine():
            ThreePointArc((14.5711889608, 11.6201351039), (16.1403320923, 9.3186247651), (17.3489268739, 6.8089517465))
            ThreePointArc((17.3489268739, 6.8089517465), (17.0417478802, 8.4050351858), (17.3288972096, 10.0048434687))
            ThreePointArc((17.3288972096, 10.0048434687), (15.7998481648, 10.5560688592), (14.5711889608, 11.6201351039))
        make_face()
        with BuildLine():
            ThreePointArc((22.2041931112, 12.8195968699), (24.2797982242, 11.8906966607), (25.6243943976, 10.0568337123))
            ThreePointArc((25.6243943976, 10.0568337123), (23.8392978471, 13.763624912), (21.521670802, 17.1629594899))
            ThreePointArc((21.521670802, 17.1629594899), (22.2419911729, 15.8596378138), (22.4914297362, 14.391547479))
            ThreePointArc((22.4914297362, 14.391547479), (22.4190309758, 13.5925584934), (22.2041931112, 12.8195968699))
        make_face()
        with BuildLine():
            ThreePointArc((14.5711889608, 11.6201351039), (15.7998481648, 10.5560688592), (17.3288972096, 10.0048434687))
            ThreePointArc((17.3288972096, 10.0048434687), (19.2641605846, 12.2823757795), (22.2041931112, 12.8195968699))
            ThreePointArc((22.2041931112, 12.8195968699), (22.4190309758, 13.5925584934), (22.4914297362, 14.391547479))
            ThreePointArc((22.4914297362, 14.391547479), (22.2419911729, 15.8596378138), (21.521670802, 17.1629594899))
            ThreePointArc((21.521670802, 17.1629594899), (19.6962706385, 18.5190224936), (17.4390806002, 18.7948589632))
            ThreePointArc((17.4390806002, 18.7948589632), (16.2611099805, 16.0480821291), (13.6100435462, 14.6681384642))
            ThreePointArc((13.6100435462, 14.6681384642), (13.8072032229, 13.0547664315), (14.5711889608, 11.6201351039))
        make_face()
        with BuildLine():
            ThreePointArc((22.2041931112, 12.8195968699), (19.2641605846, 12.2823757795), (17.3288972096, 10.0048434687))
            ThreePointArc((17.3288972096, 10.0048434687), (20.2689297362, 10.5420645591), (22.2041931112, 12.8195968699))
        make_face()
        with BuildLine():
            ThreePointArc((10.4987366772, 15.3988186477), (12.6765494203, 13.6620709396), (14.5711889608, 11.6201351039))
            ThreePointArc((14.5711889608, 11.6201351039), (13.8072032229, 13.0547664315), (13.6100435462, 14.6681384642))
            ThreePointArc((13.6100435462, 14.6681384642), (11.9864491518, 14.7441793798), (10.4987366772, 15.3988186477))
        make_face()
        with BuildLine():
            ThreePointArc((17.4390806002, 18.7948589632), (19.6962706385, 18.5190224936), (21.521670802, 17.1629594899))
            ThreePointArc((21.521670802, 17.1629594899), (18.7232849234, 20.1789022061), (15.5066517377, 22.7440815257))
            ThreePointArc((15.5066517377, 22.7440815257), (16.9325872409, 21.148459178), (17.4476944102, 19.0714499485))
            ThreePointArc((17.4476944102, 19.0714499485), (17.4455404358, 18.9330874076), (17.4390806002, 18.7948589632))
        make_face()
        with BuildLine():
            ThreePointArc((10.4987366772, 15.3988186477), (11.9864491518, 14.7441793798), (13.6100435462, 14.6681384642))
            ThreePointArc((13.6100435462, 14.6681384642), (14.7880141659, 17.4149152983), (17.4390806002, 18.7948589632))
            ThreePointArc((17.4390806002, 18.7948589632), (17.4455404358, 18.9330874076), (17.4476944102, 19.0714499485))
            ThreePointArc((17.4476944102, 19.0714499485), (16.9325872409, 21.148459178), (15.5066517377, 22.7440815257))
            ThreePointArc((15.5066517377, 22.7440815257), (13.3626425922, 23.5018519964), (11.1244292478, 23.1001153577))
            ThreePointArc((11.1244292478, 23.1001153577), (11.2174575975, 22.5821250907), (11.2486126245, 22.0567703964))
            ThreePointArc((11.2486126245, 22.0567703964), (10.5524066738, 19.6683466114), (8.681877787, 18.0281049871))
            ThreePointArc((8.681877787, 18.0281049871), (9.3458278667, 16.5445245275), (10.4987366772, 15.3988186477))
        make_face()
        with BuildLine():
            ThreePointArc((17.4390806002, 18.7948589632), (14.7880141659, 17.4149152983), (13.6100435462, 14.6681384642))
            ThreePointArc((13.6100435462, 14.6681384642), (16.2611099805, 16.0480821291), (17.4390806002, 18.7948589632))
        make_face()
        with BuildLine():
            ThreePointArc((5.4934258743, 17.8092492746), (8.086399676, 16.791582053), (10.4987366772, 15.3988186477))
            ThreePointArc((10.4987366772, 15.3988186477), (9.3458278667, 16.5445245275), (8.681877787, 18.0281049871))
            ThreePointArc((8.681877787, 18.0281049871), (7.108001728, 17.6222047723), (5.4934258743, 17.8092492746))
        make_face()
        with BuildLine():
            ThreePointArc((11.1244292478, 23.1001153577), (13.3626425922, 23.5018519964), (15.5066517377, 22.7440815257))
            ThreePointArc((15.5066517377, 22.7440815257), (11.9436259774, 24.8011953558), (8.1137993748, 26.3042915181))
            ThreePointArc((8.1137993748, 26.3042915181), (10.0430162679, 25.1004998579), (11.1244292478, 23.1001153577))
        make_face()
        with BuildLine():
            ThreePointArc((5.4934258743, 17.8092492746), (7.108001728, 17.6222047723), (8.681877787, 18.0281049871))
            ThreePointArc((8.681877787, 18.0281049871), (8.9978877924, 21.0000631688), (11.1244292478, 23.1001153577))
            ThreePointArc((11.1244292478, 23.1001153577), (10.0430162679, 25.1004998579), (8.1137993748, 26.3042915181))
            ThreePointArc((8.1137993748, 26.3042915181), (2.5560915028, 23.3669571466), (5.4934258743, 17.8092492746))
        make_face()
        with BuildLine():
            ThreePointArc((11.1244292478, 23.1001153577), (8.9978877924, 21.0000631688), (8.681877787, 18.0281049871))
            ThreePointArc((8.681877787, 18.0281049871), (10.5524066738, 19.6683466114), (11.2486126245, 22.0567703964))
            ThreePointArc((11.2486126245, 22.0567703964), (11.2174575975, 22.5821250907), (11.1244292478, 23.1001153577))
        make_face()
    extrude(amount=-F3_DEPTH, mode=Mode.SUBTRACT)


solid = f1.part
